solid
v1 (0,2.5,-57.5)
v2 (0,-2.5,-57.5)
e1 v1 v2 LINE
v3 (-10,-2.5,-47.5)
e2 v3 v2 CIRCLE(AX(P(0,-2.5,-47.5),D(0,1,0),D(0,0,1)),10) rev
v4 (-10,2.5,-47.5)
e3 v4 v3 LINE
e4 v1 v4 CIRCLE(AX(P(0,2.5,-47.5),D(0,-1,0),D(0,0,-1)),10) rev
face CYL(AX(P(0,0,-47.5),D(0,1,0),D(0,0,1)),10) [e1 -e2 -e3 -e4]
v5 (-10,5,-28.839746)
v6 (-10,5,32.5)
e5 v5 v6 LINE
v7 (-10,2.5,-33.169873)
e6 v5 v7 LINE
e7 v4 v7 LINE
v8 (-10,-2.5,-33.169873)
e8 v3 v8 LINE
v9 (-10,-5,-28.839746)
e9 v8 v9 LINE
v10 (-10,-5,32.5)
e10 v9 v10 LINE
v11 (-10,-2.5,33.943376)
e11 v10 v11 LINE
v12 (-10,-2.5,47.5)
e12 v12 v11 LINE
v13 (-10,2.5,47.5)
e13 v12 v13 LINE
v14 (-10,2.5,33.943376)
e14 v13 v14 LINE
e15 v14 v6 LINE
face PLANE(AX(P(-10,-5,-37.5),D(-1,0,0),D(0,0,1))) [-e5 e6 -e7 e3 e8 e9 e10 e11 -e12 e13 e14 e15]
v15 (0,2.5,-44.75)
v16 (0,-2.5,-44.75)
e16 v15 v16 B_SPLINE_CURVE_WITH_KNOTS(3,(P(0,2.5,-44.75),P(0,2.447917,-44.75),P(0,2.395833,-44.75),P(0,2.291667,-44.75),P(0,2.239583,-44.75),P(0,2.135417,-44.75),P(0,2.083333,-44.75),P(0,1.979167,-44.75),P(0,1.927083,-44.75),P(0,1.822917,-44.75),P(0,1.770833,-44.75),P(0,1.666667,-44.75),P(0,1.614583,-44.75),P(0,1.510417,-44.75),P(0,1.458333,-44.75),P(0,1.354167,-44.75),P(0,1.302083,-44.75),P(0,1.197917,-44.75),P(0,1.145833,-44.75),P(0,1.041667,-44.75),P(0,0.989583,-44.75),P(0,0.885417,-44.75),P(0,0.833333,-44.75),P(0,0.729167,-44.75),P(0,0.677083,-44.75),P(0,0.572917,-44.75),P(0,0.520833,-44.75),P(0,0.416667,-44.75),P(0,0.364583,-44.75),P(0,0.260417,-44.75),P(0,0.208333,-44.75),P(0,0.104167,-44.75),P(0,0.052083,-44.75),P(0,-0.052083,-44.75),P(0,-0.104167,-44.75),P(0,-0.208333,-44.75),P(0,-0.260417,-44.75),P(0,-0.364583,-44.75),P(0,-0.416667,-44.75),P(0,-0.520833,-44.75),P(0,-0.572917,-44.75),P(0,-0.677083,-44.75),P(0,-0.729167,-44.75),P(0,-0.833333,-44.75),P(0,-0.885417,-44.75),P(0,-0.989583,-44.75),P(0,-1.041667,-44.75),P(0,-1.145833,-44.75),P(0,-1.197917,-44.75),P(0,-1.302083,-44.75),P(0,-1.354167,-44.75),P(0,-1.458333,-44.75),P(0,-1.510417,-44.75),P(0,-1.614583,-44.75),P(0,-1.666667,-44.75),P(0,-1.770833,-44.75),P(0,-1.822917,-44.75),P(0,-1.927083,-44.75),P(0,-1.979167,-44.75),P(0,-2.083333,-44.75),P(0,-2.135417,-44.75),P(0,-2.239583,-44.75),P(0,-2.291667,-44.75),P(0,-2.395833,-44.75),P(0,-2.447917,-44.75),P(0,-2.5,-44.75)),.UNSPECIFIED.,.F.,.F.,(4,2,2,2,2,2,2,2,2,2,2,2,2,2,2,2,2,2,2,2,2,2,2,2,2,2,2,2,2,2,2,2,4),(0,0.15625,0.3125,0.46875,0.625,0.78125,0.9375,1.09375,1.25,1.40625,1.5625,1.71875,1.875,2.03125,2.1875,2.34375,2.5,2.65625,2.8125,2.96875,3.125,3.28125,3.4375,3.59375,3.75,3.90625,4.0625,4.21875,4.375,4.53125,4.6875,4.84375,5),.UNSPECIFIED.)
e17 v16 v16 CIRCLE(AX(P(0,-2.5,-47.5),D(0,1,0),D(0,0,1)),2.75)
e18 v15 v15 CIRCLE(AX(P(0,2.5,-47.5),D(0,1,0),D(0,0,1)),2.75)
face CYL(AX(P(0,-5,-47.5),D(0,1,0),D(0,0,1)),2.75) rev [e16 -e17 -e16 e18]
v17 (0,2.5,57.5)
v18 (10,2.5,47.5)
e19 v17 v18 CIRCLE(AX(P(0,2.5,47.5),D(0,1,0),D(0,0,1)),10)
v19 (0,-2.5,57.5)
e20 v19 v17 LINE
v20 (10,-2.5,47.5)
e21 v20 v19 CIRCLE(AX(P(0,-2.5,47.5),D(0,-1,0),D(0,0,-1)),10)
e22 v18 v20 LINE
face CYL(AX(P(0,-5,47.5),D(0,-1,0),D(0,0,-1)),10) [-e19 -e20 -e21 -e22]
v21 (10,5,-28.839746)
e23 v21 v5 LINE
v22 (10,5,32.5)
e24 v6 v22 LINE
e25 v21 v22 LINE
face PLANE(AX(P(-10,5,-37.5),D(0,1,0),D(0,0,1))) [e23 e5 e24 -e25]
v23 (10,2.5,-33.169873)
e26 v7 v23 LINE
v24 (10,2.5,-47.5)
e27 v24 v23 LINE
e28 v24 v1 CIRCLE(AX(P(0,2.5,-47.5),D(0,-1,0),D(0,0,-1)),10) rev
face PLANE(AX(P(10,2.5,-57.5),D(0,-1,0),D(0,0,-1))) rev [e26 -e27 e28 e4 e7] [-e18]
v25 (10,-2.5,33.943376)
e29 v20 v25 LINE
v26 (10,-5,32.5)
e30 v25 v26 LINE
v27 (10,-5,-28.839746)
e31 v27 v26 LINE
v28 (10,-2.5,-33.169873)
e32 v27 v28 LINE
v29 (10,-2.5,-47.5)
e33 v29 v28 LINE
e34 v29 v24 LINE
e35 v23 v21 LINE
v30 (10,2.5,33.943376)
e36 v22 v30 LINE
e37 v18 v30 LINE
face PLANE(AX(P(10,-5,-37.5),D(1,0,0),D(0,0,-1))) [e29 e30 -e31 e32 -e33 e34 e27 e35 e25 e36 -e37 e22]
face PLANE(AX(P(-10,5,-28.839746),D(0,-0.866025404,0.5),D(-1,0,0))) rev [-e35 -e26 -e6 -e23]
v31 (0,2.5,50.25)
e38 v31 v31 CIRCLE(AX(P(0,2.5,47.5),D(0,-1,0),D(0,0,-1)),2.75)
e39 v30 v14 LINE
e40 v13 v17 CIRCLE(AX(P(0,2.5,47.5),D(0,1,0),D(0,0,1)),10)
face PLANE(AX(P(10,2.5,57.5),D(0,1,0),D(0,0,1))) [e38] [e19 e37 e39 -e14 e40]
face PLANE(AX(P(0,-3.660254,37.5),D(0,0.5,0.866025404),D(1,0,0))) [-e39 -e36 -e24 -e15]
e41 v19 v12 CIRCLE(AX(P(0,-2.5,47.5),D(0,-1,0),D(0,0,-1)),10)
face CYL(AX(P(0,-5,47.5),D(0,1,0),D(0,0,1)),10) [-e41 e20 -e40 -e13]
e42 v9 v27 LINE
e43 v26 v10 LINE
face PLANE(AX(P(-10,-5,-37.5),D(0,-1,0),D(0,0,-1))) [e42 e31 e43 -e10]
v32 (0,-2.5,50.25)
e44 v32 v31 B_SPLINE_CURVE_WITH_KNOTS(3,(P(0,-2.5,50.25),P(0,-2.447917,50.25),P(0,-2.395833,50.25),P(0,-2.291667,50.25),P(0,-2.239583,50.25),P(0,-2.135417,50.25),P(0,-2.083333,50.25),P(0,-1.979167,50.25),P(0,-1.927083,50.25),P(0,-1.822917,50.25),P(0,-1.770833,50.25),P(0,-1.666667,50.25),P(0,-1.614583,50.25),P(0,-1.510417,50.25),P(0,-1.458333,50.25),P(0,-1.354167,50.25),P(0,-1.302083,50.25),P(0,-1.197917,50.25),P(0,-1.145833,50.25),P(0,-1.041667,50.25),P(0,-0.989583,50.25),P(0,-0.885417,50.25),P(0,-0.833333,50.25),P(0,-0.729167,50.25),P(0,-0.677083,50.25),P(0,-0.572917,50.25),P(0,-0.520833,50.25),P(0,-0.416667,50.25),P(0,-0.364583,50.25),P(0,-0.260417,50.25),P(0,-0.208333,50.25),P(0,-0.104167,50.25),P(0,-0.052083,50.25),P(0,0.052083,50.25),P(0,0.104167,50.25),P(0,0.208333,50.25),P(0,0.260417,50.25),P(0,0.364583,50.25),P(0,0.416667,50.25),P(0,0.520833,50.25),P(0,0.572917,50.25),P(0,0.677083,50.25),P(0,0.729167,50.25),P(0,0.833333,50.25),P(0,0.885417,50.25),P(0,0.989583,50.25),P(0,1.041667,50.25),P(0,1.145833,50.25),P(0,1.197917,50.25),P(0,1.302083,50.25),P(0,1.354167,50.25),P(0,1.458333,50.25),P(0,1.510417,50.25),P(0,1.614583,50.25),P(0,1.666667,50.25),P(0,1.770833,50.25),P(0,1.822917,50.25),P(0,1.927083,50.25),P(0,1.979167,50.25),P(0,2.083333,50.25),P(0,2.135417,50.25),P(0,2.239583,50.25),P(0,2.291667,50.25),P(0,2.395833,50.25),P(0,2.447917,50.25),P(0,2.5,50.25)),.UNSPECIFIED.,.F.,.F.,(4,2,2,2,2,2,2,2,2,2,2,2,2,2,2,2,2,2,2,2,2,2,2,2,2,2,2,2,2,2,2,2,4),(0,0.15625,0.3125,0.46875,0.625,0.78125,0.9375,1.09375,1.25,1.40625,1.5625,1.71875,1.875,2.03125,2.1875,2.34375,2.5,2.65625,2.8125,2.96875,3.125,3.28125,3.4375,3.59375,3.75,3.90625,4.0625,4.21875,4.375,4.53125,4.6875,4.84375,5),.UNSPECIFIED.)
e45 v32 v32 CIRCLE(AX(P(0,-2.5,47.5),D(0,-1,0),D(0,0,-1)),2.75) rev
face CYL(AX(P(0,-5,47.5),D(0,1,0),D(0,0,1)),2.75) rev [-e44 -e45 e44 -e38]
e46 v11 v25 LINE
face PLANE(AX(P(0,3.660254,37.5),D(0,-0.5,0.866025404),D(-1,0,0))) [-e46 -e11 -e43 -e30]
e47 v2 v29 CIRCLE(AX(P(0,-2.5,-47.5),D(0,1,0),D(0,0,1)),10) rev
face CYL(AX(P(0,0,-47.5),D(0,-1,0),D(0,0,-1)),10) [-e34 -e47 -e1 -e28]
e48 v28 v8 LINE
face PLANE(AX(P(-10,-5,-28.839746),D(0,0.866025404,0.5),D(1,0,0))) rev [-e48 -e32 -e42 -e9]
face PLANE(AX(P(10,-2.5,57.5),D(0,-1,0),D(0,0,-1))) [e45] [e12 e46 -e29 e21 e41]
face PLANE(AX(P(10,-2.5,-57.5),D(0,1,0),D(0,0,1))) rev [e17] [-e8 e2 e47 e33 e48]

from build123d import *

# Parameters (mm, degrees)
BOSS_EXTRUDE1_DEPTH      = 37.5
BOSS_EXTRUDE1_DEPTH_BACK = 37.5
SKETCH1_W                = 20
SKETCH1_H                = 10
SKETCH3_W                = 20
SKETCH3_H                = 5
BOSS_EXTRUDE2_DEPTH      = 20
FILLET1_R                = 10
SKETCH4_R                = 2.75
CUT_EXTRUDE1_DEPTH       = 59.84301148
FILLET1_OF_MIRROR3_R     = 10
CHAMFER1_SIZE            = 8.660254038
CHAMFER1_SIZE_2          = 5


# Some blends are built 0.0001 mm under size
with BuildPart() as part:
    # Sketch1 → Boss-Extrude1 (new, two sides: drawn at the far end of the back side and taken through both)
    with BuildSketch(Plane.XY.offset(-BOSS_EXTRUDE1_DEPTH_BACK)):
        Rectangle(SKETCH1_W, SKETCH1_H)
    extrude(amount=BOSS_EXTRUDE1_DEPTH + BOSS_EXTRUDE1_DEPTH_BACK)

    # Sketch3 → Boss-Extrude2 (add)
    with BuildSketch(Plane(origin=(0, 0, -37.5), x_dir=(-1, 0, 0), z_dir=(0, 0, -1))):
        Rectangle(SKETCH3_W, SKETCH3_H)
    boss_extrude2 = extrude(amount=BOSS_EXTRUDE2_DEPTH)

    # Fillet1
    fillet1_edges = [part.edges().sort_by_distance(p)[0] for p in [
        (-10, 0, -57.5),
        (10, 0, -57.5),
    ]]
    fillet(fillet1_edges, radius=FILLET1_R - 0.0001)  # a hair under: the kernel refuses the full size

    # Sketch4 → Cut-Extrude1 (cut, through all)
    with BuildSketch(Plane(origin=(0, 2.5, 0), x_dir=(1, 0, 0), z_dir=(0, 1, 0))):
        with Locations(Location((0, 47.5, 0), (0, 0, 270))):
            Circle(SKETCH4_R)
    cut_extrude1 = extrude(amount=-CUT_EXTRUDE1_DEPTH, mode=Mode.SUBTRACT)

    # Mirror3: Boss-Extrude2, Cut-Extrude1 across plane
    add(boss_extrude2.mirror(Plane.XY))
    add(cut_extrude1.mirror(Plane.XY), mode=Mode.SUBTRACT)

    # Fillet1 of Mirror3
    fillet1_of_mirror3_edges = [part.edges().sort_by_distance(p)[0] for p in [
        (-10, 0, 57.5),
        (10, 0, 57.5),
    ]]
    fillet(fillet1_of_mirror3_edges, radius=FILLET1_OF_MIRROR3_R - 0.0001)  # a hair under: the kernel refuses the full size

    # Chamfer1
    # the kernel refuses this chamfer: 8.660254038, 5 mm, written as the material it takes off along each edge
    with BuildSketch(Plane(origin=(32.404819853, 5, -37.5), x_dir=(0, 0.019326765612700598, 0.9998132206222078), z_dir=(-1, 0, 0))) as chamfer1_piece_1_section:
        Polygon((CHAMFER1_SIZE * 0.999813220604, -CHAMFER1_SIZE * 0.0193267656124), (-CHAMFER1_SIZE_2 * 0.0193267656127, -CHAMFER1_SIZE_2 * 0.999813220622), (0, 0), align=None)
    chamfer1_piece_1 = extrude(amount=64.809639706, mode=Mode.PRIVATE)
    chamfer1_piece_1 = split(chamfer1_piece_1, bisect_by=Plane(origin=(0, 2.5, -34.039331058), z_dir=(0, 1, 0)), keep=Keep.TOP, mode=Mode.PRIVATE)
    add(chamfer1_piece_1, mode=Mode.SUBTRACT)
    with BuildSketch(Plane(origin=(-32.404819853, -5, -37.5), x_dir=(0, -0.019326765612700598, 0.9998132206222078), z_dir=(1, 0, 0))) as chamfer1_piece_2_section:
        Polygon((CHAMFER1_SIZE * 0.999813220604, -CHAMFER1_SIZE * 0.0193267656124), (-CHAMFER1_SIZE_2 * 0.0193267656127, -CHAMFER1_SIZE_2 * 0.999813220622), (0, 0), align=None)
    chamfer1_piece_2 = extrude(amount=64.809639706, mode=Mode.PRIVATE)
    chamfer1_piece_2 = split(chamfer1_piece_2, bisect_by=Plane(origin=(0, -2.5, -34.039331058), z_dir=(0, -1, 0)), keep=Keep.TOP, mode=Mode.PRIVATE)
    add(chamfer1_piece_2, mode=Mode.SUBTRACT)
    with BuildSketch(Plane(origin=(-32.404819853, -5, 37.5), x_dir=(0, 0.999813220622208, 0.019326765612700494), z_dir=(1, 0, 0))) as chamfer1_piece_3_section:
        Polygon((CHAMFER1_SIZE * 0.999813220604, -CHAMFER1_SIZE * 0.0193267656124), (-CHAMFER1_SIZE_2 * 0.0193267656127, -CHAMFER1_SIZE_2 * 0.999813220622), (0, 0), align=None)
    chamfer1_piece_3 = extrude(amount=64.809639706, mode=Mode.PRIVATE)
    chamfer1_piece_3 = split(chamfer1_piece_3, bisect_by=Plane(origin=(0, 2.5, 37.476500167), z_dir=(0, 1, 0)), keep=Keep.TOP, mode=Mode.PRIVATE)
    add(chamfer1_piece_3, mode=Mode.SUBTRACT)
    with BuildSketch(Plane(origin=(-32.404819853, -5, 37.5), x_dir=(0, 0.999813220622208, 0.019326765612700494), z_dir=(1, 0, 0))) as chamfer1_piece_4_section:
        Polygon((CHAMFER1_SIZE * 0.999813220604, -CHAMFER1_SIZE * 0.0193267656124), (-CHAMFER1_SIZE_2 * 0.0193267656127, -CHAMFER1_SIZE_2 * 0.999813220622), (0, 0), align=None)
    chamfer1_piece_4 = extrude(amount=64.809639706, mode=Mode.PRIVATE)
    chamfer1_piece_4 = split(chamfer1_piece_4, bisect_by=Plane(origin=(0, -2.5, 35.327003025), z_dir=(0, -1, 0)), keep=Keep.TOP, mode=Mode.PRIVATE)
    add(chamfer1_piece_4, mode=Mode.SUBTRACT)
    with BuildSketch(Plane(origin=(32.404819853, 5, 37.5), x_dir=(0, -0.999813220622208, 0.019326765612700494), z_dir=(-1, 0, 0))) as chamfer1_piece_5_section:
        Polygon((CHAMFER1_SIZE * 0.999813220604, -CHAMFER1_SIZE * 0.0193267656124), (-CHAMFER1_SIZE_2 * 0.0193267656127, -CHAMFER1_SIZE_2 * 0.999813220622), (0, 0), align=None)
    chamfer1_piece_5 = extrude(amount=64.809639706, mode=Mode.PRIVATE)
    chamfer1_piece_5 = split(chamfer1_piece_5, bisect_by=Plane(origin=(0, -2.5, 37.476500167), z_dir=(0, -1, 0)), keep=Keep.TOP, mode=Mode.PRIVATE)
    add(chamfer1_piece_5, mode=Mode.SUBTRACT)
    with BuildSketch(Plane(origin=(32.404819853, 5, 37.5), x_dir=(0, -0.999813220622208, 0.019326765612700494), z_dir=(-1, 0, 0))) as chamfer1_piece_6_section:
        Polygon((CHAMFER1_SIZE * 0.999813220604, -CHAMFER1_SIZE * 0.0193267656124), (-CHAMFER1_SIZE_2 * 0.0193267656127, -CHAMFER1_SIZE_2 * 0.999813220622), (0, 0), align=None)
    chamfer1_piece_6 = extrude(amount=64.809639706, mode=Mode.PRIVATE)
    chamfer1_piece_6 = split(chamfer1_piece_6, bisect_by=Plane(origin=(0, 2.5, 35.327003025), z_dir=(0, 1, 0)), keep=Keep.TOP, mode=Mode.PRIVATE)
    add(chamfer1_piece_6, mode=Mode.SUBTRACT)


solid = part.part
